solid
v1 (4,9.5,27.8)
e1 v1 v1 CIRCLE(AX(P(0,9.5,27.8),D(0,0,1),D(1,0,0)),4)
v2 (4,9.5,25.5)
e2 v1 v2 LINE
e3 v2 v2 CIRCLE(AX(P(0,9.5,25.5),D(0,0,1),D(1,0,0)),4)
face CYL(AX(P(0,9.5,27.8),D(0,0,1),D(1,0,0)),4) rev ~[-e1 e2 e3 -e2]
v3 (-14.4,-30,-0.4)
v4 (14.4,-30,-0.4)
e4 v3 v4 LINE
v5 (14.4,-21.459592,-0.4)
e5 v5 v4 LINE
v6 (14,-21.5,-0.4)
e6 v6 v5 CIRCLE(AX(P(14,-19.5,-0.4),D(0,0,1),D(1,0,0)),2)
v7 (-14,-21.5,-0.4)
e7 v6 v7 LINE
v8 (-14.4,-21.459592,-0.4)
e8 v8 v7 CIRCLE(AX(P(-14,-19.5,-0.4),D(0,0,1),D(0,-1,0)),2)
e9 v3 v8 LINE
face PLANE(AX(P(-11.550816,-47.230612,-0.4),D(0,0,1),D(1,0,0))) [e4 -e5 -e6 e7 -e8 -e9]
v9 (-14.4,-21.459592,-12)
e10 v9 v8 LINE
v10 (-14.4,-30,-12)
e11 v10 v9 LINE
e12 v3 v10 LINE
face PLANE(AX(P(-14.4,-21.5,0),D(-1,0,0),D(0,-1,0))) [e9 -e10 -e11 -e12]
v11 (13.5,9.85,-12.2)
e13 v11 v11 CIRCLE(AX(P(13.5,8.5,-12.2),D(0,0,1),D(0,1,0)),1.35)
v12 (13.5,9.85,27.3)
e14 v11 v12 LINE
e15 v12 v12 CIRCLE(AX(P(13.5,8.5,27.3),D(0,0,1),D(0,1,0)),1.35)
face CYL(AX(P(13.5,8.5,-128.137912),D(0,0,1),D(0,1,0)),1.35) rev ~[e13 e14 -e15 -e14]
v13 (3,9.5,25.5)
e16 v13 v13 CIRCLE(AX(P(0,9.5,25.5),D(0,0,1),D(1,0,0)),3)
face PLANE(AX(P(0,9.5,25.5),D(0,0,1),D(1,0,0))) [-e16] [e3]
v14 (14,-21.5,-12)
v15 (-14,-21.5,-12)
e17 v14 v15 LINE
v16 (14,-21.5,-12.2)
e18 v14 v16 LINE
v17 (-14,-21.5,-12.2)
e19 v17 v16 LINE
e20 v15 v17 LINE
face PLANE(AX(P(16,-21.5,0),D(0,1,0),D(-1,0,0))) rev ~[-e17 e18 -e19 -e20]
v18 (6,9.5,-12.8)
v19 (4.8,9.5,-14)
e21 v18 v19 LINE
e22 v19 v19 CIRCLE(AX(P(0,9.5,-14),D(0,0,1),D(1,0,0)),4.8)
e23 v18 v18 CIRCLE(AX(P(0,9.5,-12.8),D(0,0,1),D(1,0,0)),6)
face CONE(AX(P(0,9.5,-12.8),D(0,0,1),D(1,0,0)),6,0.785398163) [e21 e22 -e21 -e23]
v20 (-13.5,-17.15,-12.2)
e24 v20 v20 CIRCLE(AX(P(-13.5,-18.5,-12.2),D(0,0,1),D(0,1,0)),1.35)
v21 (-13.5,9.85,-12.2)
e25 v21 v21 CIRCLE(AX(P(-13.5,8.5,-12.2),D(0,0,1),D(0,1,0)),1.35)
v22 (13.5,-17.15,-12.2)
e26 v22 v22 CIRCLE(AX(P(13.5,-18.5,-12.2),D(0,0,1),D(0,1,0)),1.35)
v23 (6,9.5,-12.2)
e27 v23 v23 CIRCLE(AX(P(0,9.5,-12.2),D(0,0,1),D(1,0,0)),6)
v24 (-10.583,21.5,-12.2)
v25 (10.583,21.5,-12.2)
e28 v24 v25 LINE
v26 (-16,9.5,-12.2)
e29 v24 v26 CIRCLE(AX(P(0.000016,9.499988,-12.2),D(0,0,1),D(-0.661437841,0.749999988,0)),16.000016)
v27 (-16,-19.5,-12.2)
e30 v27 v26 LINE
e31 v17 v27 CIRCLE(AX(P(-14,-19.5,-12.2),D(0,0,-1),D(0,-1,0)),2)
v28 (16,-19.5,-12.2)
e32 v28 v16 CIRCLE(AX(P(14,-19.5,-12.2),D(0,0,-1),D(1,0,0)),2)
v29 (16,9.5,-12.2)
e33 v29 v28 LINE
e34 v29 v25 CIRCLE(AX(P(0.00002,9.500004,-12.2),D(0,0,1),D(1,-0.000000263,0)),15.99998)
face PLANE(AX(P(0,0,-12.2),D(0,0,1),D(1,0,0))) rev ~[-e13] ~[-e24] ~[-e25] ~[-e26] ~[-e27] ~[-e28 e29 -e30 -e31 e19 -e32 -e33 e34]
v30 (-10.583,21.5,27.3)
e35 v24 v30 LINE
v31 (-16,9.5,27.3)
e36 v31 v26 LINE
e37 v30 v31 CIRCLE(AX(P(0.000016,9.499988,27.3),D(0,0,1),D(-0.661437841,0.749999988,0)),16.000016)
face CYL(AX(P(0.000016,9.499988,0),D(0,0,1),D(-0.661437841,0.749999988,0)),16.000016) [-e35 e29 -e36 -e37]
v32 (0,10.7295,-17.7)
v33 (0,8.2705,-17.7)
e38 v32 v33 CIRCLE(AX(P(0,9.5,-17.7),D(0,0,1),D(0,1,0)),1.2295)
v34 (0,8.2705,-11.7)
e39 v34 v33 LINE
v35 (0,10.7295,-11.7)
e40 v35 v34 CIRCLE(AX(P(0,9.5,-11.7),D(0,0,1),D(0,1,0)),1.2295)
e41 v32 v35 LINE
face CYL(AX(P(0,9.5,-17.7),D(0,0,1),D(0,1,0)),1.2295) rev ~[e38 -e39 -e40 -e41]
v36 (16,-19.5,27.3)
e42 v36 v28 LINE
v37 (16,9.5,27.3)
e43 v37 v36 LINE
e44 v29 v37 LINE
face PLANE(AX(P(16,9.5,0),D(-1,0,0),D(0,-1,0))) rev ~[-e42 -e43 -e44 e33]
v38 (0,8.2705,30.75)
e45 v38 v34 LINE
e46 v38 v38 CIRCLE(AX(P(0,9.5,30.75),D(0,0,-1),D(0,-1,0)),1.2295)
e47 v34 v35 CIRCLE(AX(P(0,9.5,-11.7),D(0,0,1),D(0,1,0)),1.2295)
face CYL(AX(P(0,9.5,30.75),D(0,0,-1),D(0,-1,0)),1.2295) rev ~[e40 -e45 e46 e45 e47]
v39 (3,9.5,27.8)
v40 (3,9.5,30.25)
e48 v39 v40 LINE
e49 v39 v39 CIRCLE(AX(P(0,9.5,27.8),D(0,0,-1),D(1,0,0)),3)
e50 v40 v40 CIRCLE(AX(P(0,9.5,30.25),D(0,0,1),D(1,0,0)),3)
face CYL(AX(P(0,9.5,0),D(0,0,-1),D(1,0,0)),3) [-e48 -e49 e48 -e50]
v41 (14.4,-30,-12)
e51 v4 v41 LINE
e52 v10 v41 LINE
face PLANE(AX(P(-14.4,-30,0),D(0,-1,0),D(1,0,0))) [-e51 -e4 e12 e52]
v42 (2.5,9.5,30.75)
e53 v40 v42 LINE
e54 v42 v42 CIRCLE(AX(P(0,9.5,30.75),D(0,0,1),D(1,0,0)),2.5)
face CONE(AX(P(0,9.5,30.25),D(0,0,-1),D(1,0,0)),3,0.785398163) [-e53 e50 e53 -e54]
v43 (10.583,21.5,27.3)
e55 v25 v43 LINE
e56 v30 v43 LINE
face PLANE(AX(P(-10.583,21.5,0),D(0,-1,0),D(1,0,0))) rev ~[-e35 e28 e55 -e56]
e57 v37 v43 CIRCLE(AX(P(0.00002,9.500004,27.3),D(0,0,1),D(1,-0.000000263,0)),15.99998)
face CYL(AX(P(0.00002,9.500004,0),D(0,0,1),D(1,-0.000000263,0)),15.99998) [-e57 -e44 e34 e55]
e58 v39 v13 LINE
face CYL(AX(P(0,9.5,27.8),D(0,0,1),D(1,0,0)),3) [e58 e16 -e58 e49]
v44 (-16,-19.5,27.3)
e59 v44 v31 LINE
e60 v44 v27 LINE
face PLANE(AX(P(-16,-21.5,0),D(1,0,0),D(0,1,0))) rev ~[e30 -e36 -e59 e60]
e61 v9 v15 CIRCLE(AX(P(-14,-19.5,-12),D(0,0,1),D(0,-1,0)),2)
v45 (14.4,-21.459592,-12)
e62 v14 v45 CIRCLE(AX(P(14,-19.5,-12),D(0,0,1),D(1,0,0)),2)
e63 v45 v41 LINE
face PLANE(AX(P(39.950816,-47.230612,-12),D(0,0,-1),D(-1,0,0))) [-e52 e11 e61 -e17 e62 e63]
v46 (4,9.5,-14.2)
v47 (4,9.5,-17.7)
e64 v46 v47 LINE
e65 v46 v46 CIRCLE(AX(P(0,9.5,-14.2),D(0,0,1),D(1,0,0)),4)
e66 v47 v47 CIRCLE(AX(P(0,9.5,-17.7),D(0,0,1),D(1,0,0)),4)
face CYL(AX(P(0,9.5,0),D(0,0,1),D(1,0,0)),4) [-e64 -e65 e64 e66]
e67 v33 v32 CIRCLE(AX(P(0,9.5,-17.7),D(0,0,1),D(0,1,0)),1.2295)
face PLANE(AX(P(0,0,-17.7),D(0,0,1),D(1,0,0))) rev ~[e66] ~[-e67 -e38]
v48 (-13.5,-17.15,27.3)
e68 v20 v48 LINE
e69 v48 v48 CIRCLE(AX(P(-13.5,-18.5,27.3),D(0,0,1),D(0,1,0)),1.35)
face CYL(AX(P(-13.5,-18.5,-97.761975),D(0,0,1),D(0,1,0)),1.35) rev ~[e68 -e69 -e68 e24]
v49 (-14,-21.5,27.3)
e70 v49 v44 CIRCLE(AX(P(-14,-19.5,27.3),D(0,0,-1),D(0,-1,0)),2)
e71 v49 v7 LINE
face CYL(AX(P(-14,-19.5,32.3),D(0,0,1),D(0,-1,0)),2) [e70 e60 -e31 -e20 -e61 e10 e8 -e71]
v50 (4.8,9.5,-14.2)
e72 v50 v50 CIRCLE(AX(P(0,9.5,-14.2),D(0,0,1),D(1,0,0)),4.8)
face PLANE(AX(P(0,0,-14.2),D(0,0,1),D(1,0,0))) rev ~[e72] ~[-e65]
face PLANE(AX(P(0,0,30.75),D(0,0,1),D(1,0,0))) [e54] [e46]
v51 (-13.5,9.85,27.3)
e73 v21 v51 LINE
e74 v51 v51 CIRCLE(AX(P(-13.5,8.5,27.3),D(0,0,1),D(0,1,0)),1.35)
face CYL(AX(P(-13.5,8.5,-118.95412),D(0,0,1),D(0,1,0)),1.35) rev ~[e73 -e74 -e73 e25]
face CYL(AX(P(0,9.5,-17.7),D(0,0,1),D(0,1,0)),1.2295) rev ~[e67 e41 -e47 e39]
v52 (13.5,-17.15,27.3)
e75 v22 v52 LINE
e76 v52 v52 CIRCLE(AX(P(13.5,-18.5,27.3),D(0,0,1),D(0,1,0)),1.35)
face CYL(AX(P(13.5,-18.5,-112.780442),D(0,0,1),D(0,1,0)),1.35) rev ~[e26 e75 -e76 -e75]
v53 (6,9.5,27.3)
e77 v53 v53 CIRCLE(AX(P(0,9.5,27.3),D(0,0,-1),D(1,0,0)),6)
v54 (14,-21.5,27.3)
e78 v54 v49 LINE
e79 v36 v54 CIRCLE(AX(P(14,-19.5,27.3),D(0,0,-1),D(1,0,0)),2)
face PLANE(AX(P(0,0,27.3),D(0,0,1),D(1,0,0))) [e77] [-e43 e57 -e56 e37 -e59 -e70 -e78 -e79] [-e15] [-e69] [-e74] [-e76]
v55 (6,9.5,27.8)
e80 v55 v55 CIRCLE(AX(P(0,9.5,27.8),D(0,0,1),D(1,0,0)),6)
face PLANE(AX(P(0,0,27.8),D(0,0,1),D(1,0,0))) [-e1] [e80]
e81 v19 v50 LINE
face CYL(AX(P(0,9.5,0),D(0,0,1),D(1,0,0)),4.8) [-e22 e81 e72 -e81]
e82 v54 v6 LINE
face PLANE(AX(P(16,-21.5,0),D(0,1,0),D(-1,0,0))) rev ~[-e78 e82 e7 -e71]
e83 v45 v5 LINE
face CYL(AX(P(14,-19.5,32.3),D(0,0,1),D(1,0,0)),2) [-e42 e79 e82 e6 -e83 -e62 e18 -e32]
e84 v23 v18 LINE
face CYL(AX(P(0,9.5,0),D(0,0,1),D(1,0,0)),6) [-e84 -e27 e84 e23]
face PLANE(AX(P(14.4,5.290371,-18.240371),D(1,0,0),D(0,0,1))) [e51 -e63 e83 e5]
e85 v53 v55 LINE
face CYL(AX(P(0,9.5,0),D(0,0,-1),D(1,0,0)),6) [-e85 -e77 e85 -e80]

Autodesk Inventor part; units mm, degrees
ref_plane "YZ Plane" through (0, 0, 0) normal (1, 0, 0) x (0, 1, 0)
ref_plane "XZ Plane" through (0, 0, 0) normal (0, 1, 0) x (-1, 0, 0)
ref_plane "XY Plane" through (0, 0, 0) normal (0, 0, 1) x (1, 0, 0)
sketch "スケッチ1" plane through (0, 0, 0) normal (0, 0, 1) x (1, 0, 0)
  line L0 (-16, 21.5) -> (-10.583, 21.5) construction
  line L1 (16, 21.5) -> (16, 9.5) construction
  line L2 (16, -21.5) -> (-16, -21.5)
  line L3 (-16, -21.5) -> (-16, 9.5)
  line L4 (-16, 21.5) -> (16, -21.5) construction
  line L5 (16, 21.5) -> (-16, -21.5) construction
  line L6 (-14.4, -21.5) -> (-14.4, -30)
  line L7 (-14.4, -30) -> (14.4, -30)
  line L8 (0, 21.5) -> (0, -21.5) construction
  line L9 (14.4, -21.5) -> (14.4, -30)
  line L10 (-13.5, 21.5) -> (-13.5, -21.5) construction
  circle A0 centre (0, 9.5) radius 6
  circle A1 centre (0, 9.5) radius 4
  arc A2 (-10.583, 21.5) -> (-16, 9.5) centre (0, 9.5) ccw
  arc A3 (16, 9.5) -> (10.583, 21.5) centre (0, 9.5) ccw
  line L11 (-10.583, 21.5) -> (10.583, 21.5)
  line L12 (-16, 9.5) -> (-16, 21.5) construction
  line L13 (10.583, 21.5) -> (16, 21.5) construction
  line L14 (16, 9.5) -> (16, -21.5)
  circle A4 centre (0, 9.5) radius 3
  circle A5 centre (0, 9.5) radius 4.8
  point P0 (0, 0)
  point P1 (-13.5, 8.5)
  point P2 (-13.5, -18.5)
  point P3 (13.5, 8.5)
  point P4 (13.5, -18.5)
  dimension "d0" = 32
  dimension "d1" = 43
  dimension "d4" = 28.8
  dimension "d5" = 8.5
  dimension "d8" = 27
  dimension "d9" = 8.5
  dimension "d12" = 18.5
  dimension "d13" = 12
  dimension "d14" = 8
  dimension "d15" = 9.5
  dimension "d17" = 16
  dimension "d32" = 13.5
  dimension "d47" = 6
  dimension "d67" = 9.6
extrude "押し出し1" add sketch "スケッチ1" against normal blind 12.2 contours L2 L3 A2 L11 A3 L14 | A0 | A1 | A4 | A5
extrude "押し出し2" add sketch "スケッチ1" against normal blind 12 contours L9 L7 L6 L2
extrude "押し出し3" add sketch "スケッチ1" against normal blind 14 contours A0 | A1 | A4 | A5
extrude "押し出し4" add sketch "スケッチ1" against normal blind 17.7 contours A1 | A4
chamfer "面取り1" distance 1.2 angle 45 1 edges at (-6, 9.5, -14)
sketch "スケッチ2" plane through (0, 9.5, -17.7) normal (0, 0, -1) x (-1, 0, 0)
  circle A0 centre (0, 0) radius 4 projected
  point P0 (0, -9.5)
hole "穴1" at (0, 9.5, -17.7) direction (0, 0, 1) diameter 2.459 depth 6 thread size "M3x0.5" class "6H" standard "ANSI Metric M Profile"
extrude "押し出し5" add sketch "スケッチ1" along normal blind 27.3 contours L2 L3 A2 L11 A3 L14 | A0 | A1 | A4 | A5
hole "穴2" at (-13.5, 8.5, 0) at (-13.5, -18.5, 0) at (13.5, 8.5, 0) at (13.5, -18.5, 0) direction (0, 0, 1) diameter 2.7 end through all both
extrude "押し出し6" cut sketch "スケッチ1" against normal blind 0.4 contours L9 L7 L6 L2
fillet "フィレット1" radius 2 2 edges at (16, -21.5, 7.55) (-16, -21.5, 7.55)
extrude "押し出し7" add sketch "スケッチ1" along normal blind 27.8 contours A0 | A1 | A4 | A5
extrude "押し出し8" add sketch "スケッチ1" along normal blind 30.75 contours A4
sketch "スケッチ3" plane through (0, 9.5, 30.75) normal (0, 0, 1) x (1, 0, 0)
  circle A0 centre (0, 0) radius 1.2295 projected
  point P0 (0, -9.5)
hole "穴3" at (0, 9.5, 30.75) direction (0, 0, -1) diameter 2.459 end through all thread size "M3x0.5" class "6H" standard "ANSI Metric M Profile"
sketch "スケッチ4" plane through (0, 9.5, 27.8) normal (0, 0, 1) x (1, 0, 0)
  circle A0 centre (0, 0) radius 4
  circle A1 centre (0, 0) radius 3
  point P0 (0, -9.5)
extrude "押し出し9" cut sketch "スケッチ4" against normal blind 2.3
chamfer "面取り2" distance 0.5 angle 45 1 edges at (-3, 9.5, 30.75)
extrude "押し出し10" add sketch "スケッチ1" against normal blind 14.2 contours A5
properties part number "B3M11xx"
